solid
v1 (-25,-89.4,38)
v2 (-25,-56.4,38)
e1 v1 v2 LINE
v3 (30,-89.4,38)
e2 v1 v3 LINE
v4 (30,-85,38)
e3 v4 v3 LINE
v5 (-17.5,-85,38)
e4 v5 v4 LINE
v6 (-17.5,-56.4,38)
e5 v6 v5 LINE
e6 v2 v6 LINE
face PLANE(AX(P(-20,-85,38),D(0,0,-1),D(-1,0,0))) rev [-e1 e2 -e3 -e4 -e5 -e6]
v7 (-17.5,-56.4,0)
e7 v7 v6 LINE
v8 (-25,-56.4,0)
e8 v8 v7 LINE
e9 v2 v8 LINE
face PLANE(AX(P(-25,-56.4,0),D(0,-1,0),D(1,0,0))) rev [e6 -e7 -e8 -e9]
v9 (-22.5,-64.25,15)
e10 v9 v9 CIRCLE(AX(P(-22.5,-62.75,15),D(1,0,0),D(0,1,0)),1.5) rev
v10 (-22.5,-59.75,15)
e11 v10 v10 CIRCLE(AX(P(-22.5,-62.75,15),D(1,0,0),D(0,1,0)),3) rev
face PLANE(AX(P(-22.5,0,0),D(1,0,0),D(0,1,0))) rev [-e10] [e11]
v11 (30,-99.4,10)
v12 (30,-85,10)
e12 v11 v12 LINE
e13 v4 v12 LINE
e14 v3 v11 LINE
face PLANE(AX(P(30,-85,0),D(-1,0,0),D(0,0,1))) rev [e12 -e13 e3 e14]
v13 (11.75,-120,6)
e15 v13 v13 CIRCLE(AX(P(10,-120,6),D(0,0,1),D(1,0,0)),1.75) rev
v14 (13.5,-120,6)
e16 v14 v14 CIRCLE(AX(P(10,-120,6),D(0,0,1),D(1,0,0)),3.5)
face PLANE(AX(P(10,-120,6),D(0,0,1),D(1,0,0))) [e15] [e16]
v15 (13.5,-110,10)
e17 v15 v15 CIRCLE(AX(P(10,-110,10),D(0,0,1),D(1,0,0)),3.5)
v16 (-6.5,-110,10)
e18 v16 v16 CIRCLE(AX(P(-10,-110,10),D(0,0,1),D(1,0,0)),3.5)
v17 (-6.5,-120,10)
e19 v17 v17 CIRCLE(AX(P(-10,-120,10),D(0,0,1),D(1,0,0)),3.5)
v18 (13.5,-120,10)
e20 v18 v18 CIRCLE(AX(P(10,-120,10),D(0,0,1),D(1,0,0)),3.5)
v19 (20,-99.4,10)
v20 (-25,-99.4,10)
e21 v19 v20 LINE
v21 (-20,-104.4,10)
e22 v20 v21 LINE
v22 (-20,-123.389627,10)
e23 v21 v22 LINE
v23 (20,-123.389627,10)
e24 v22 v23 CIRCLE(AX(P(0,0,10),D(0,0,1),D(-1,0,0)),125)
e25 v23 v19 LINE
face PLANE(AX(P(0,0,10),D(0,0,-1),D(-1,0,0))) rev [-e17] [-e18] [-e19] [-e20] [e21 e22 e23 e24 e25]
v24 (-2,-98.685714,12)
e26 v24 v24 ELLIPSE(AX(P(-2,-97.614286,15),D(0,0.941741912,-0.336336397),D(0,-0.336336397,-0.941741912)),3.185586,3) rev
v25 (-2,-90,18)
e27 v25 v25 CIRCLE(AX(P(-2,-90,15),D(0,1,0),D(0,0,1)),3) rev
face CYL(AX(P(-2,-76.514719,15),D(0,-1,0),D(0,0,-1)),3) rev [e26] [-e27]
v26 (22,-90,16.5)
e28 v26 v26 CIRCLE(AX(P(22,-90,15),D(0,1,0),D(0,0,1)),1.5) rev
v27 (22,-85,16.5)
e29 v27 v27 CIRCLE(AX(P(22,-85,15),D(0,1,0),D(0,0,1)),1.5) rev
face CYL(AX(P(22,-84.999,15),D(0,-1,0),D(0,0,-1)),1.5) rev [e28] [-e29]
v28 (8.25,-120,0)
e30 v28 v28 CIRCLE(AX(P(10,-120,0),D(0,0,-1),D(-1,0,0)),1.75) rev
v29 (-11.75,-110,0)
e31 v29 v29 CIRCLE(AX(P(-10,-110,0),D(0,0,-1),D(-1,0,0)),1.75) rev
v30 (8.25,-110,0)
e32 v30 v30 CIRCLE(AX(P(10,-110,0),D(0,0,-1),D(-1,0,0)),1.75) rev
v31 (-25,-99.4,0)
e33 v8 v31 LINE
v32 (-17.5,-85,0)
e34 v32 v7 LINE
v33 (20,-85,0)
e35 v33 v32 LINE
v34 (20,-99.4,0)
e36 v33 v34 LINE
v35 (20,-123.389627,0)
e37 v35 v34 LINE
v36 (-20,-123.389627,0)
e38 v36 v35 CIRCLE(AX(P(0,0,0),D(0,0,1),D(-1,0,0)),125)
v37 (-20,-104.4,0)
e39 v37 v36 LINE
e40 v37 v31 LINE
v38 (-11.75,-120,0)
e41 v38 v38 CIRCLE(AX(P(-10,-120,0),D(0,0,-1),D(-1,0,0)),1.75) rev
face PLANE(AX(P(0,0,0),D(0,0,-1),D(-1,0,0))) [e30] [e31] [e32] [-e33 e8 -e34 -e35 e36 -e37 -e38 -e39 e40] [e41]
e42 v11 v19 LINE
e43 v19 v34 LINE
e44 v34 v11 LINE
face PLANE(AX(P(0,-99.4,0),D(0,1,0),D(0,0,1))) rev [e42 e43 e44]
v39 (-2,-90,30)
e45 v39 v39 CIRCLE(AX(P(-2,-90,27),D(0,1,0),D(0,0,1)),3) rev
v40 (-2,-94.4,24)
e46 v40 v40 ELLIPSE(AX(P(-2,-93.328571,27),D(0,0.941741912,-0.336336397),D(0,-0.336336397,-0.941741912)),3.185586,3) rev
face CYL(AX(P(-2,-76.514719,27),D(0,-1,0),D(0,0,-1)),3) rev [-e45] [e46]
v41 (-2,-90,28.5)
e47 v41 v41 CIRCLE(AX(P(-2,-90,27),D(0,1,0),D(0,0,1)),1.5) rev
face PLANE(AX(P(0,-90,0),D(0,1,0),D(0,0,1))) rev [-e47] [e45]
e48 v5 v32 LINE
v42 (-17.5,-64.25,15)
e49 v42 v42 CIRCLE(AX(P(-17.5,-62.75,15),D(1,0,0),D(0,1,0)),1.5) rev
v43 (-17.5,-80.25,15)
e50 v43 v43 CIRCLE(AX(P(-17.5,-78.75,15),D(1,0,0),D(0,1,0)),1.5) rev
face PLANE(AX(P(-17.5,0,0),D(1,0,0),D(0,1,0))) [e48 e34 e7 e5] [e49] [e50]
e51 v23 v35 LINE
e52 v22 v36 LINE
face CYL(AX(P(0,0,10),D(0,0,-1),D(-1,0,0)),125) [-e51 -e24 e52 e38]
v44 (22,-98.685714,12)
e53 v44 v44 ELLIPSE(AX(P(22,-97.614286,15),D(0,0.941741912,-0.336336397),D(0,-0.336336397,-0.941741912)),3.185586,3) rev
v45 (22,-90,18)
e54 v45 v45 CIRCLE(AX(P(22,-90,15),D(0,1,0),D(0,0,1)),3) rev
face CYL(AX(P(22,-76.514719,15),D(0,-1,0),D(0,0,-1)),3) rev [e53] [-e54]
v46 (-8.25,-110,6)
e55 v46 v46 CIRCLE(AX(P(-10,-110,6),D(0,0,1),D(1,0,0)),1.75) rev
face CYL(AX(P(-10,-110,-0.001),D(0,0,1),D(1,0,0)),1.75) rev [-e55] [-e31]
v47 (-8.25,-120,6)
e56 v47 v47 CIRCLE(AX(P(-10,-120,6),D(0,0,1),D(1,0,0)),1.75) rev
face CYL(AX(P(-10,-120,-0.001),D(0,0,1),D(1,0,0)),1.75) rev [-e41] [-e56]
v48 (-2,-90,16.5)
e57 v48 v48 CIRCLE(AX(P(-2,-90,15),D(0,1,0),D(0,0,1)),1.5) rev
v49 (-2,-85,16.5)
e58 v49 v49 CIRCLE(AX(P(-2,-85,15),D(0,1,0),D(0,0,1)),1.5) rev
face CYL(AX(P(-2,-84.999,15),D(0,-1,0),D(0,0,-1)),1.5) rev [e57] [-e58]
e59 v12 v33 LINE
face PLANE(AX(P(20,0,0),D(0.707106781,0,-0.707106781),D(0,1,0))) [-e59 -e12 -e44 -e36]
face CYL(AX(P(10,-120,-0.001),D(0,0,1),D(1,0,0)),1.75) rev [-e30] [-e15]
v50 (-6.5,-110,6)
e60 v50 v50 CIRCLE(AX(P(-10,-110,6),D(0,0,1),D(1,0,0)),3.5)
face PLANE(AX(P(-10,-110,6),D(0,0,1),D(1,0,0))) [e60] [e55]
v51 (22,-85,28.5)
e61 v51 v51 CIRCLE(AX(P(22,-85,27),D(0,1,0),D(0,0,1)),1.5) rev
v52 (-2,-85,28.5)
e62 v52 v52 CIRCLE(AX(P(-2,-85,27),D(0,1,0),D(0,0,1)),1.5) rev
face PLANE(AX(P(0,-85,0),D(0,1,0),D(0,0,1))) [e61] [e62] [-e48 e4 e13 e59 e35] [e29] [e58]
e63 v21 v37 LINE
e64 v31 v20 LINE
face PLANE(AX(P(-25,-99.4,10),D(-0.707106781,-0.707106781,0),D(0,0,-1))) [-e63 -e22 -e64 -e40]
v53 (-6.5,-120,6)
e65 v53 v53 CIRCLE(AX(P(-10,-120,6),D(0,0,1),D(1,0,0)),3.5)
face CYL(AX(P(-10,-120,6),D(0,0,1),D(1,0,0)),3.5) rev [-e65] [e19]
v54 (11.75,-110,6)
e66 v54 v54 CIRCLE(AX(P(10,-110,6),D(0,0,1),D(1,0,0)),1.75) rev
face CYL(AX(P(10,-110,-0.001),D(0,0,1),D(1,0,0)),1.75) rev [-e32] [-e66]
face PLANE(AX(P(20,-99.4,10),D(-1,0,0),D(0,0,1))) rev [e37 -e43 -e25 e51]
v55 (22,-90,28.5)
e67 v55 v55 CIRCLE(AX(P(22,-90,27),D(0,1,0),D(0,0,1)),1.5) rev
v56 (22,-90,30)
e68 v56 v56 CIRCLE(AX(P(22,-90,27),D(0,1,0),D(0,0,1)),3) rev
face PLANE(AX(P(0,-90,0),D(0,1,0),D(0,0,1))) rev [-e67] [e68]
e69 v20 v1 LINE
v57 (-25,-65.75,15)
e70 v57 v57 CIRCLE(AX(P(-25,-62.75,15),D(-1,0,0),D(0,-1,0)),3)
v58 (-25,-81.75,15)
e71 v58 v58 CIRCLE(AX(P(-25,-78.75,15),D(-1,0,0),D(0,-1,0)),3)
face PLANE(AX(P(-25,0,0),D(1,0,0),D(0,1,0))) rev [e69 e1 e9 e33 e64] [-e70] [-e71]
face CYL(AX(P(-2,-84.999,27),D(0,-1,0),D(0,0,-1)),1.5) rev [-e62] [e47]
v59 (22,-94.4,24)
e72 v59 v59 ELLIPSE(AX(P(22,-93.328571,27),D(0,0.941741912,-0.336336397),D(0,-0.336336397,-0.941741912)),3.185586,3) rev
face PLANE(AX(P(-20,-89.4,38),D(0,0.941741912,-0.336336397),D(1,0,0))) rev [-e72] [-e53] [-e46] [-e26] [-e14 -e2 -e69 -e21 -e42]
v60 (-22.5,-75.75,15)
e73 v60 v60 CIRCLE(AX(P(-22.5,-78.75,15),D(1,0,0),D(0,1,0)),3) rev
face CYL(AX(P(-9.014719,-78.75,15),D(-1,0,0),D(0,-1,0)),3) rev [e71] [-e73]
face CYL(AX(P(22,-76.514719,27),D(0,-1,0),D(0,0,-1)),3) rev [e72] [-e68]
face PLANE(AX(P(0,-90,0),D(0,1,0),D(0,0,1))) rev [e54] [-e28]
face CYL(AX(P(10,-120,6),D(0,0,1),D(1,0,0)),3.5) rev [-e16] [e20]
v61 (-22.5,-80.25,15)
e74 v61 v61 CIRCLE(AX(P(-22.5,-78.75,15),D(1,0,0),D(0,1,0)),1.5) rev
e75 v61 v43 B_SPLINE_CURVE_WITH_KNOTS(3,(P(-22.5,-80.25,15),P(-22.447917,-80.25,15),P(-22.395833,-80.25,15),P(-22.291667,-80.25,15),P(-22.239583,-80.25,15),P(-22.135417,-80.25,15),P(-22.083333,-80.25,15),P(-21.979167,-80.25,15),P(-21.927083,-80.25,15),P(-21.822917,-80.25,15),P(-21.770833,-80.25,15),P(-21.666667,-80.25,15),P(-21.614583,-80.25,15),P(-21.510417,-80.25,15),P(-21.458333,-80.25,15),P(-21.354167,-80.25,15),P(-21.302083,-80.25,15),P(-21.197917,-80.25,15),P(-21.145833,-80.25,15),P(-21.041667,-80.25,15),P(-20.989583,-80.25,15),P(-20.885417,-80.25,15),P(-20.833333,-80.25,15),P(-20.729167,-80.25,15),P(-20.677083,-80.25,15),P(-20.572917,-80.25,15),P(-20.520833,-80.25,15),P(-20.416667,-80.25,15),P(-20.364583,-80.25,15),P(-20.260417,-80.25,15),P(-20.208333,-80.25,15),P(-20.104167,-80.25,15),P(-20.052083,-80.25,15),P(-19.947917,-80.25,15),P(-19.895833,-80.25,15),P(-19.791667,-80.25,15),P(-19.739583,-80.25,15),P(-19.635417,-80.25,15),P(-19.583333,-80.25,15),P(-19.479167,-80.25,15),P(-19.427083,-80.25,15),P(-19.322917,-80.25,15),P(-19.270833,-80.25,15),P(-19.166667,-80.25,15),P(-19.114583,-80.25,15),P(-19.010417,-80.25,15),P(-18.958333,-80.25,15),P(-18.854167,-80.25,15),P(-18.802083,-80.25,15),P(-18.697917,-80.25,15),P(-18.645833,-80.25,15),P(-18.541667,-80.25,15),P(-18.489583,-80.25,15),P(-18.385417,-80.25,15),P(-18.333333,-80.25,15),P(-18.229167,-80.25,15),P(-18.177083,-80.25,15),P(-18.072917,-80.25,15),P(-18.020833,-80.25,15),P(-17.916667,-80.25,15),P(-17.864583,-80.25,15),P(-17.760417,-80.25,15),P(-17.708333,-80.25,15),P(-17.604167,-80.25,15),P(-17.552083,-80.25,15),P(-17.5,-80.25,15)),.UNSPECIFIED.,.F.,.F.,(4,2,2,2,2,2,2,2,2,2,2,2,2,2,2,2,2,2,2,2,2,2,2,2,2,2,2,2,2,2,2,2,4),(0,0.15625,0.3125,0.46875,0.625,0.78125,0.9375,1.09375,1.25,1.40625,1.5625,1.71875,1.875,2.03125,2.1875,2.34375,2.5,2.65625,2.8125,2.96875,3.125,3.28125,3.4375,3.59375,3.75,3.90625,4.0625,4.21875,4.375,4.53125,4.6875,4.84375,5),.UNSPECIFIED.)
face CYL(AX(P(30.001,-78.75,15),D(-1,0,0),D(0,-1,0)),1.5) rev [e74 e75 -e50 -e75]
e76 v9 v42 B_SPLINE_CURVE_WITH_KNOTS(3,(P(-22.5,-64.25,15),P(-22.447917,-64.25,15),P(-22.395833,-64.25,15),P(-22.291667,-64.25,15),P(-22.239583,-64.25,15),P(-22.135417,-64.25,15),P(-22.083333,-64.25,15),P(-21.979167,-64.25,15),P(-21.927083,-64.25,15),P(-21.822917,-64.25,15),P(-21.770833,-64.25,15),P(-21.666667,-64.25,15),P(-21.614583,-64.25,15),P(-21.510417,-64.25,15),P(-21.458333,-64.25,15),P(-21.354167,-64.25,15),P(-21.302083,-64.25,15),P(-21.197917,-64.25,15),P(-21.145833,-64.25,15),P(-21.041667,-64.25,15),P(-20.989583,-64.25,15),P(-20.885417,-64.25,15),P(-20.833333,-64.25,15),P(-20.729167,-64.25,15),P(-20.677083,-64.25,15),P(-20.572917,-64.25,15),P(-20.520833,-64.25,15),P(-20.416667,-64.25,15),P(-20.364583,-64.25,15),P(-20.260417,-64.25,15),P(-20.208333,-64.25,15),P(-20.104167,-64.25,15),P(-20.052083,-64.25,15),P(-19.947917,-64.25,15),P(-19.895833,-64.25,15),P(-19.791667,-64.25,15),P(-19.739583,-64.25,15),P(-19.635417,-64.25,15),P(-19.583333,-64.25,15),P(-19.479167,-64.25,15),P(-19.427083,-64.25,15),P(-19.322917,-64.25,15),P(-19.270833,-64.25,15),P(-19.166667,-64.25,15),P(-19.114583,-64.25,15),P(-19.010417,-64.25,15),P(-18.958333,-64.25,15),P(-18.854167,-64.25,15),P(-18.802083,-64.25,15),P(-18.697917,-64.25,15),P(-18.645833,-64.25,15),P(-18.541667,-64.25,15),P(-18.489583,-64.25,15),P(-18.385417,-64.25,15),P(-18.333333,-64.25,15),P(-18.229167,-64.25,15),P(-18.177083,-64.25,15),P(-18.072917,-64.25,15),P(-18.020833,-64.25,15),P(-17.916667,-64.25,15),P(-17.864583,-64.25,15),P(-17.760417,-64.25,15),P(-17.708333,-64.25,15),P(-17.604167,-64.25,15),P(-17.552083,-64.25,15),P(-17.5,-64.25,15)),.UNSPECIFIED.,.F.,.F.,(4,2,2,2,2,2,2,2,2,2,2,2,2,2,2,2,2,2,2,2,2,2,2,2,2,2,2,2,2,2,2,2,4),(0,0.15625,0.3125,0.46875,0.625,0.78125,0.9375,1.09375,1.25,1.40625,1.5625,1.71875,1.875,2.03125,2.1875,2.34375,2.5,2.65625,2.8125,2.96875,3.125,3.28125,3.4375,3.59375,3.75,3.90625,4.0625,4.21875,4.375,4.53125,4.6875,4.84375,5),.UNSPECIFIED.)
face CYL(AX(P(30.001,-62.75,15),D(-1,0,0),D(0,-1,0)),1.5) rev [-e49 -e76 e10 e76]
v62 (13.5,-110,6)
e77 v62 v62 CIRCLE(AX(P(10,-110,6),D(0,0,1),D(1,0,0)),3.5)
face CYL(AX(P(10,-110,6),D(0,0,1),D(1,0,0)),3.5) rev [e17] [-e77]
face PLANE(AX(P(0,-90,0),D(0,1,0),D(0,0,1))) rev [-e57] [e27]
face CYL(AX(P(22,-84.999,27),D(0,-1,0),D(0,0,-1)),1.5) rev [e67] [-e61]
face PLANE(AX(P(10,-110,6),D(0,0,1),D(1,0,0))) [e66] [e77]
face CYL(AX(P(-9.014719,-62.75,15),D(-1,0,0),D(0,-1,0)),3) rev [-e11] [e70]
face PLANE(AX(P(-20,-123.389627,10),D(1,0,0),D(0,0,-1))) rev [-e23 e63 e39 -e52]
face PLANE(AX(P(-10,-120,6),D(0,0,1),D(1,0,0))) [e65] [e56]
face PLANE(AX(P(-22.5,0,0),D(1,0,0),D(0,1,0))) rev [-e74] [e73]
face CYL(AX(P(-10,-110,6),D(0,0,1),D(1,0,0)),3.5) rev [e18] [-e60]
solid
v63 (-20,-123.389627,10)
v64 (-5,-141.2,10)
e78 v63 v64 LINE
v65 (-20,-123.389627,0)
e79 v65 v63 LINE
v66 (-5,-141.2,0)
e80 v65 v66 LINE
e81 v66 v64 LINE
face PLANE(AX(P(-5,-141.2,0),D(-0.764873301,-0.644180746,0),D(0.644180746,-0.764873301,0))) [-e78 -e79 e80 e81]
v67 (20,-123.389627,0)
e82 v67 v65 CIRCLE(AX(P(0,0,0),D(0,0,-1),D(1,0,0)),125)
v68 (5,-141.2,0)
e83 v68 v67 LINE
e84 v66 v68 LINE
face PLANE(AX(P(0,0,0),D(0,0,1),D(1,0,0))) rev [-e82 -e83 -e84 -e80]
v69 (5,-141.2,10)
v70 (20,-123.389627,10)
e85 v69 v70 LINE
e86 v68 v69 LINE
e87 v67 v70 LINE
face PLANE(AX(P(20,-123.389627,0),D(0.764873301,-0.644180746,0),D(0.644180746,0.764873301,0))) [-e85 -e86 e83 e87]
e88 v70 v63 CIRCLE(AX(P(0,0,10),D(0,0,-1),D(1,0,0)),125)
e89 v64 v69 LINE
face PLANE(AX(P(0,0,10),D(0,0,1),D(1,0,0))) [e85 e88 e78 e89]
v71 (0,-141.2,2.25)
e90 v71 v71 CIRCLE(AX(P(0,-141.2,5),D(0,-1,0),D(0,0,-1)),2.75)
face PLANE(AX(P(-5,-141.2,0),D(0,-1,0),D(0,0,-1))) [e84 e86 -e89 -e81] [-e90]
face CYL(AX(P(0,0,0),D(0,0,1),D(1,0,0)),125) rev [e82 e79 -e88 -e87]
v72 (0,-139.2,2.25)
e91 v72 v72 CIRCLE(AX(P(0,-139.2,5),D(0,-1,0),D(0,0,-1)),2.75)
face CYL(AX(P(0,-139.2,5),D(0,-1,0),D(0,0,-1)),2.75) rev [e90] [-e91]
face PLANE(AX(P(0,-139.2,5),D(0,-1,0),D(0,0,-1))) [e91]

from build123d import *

# Parameters (mm, degrees)
BOSS_EXTRU_1_DEPTH      = 10
ENL_V_MAT_EXTRU_1_REACH = 128.984
ESQUISSE2_R             = 1.75
ESQUISSE4_R             = 3.5
ENL_V_MAT_EXTRU_2_DEPTH = 4
ESQUISSE5_W             = 50
ESQUISSE5_H             = 38
BOSS_EXTRU_2_DEPTH      = 14.4
ENL_V_MAT_EXTRU_3_REACH = 56.766
ESQUISSE6_R             = 1.5
ESQUISSE7_R             = 3
ENL_V_MAT_EXTRU_4_DEPTH = 9.4
CHANFREIN1_SIZE         = 10
CHANFREIN2_SIZE         = 28
CHANFREIN2_SIZE_2       = 10
BOSS_EXTRU_3_DEPTH      = 5
ESQUISSE9_W             = 38
ESQUISSE9_H             = 28.6
BOSS_EXTRU_4_DEPTH      = 2.5
CHANFREIN3_SIZE         = 5
ENL_V_MAT_EXTRU_5_REACH = 143.753
ESQUISSE10_R            = 1.5
ESQUISSE11_R            = 3
ENL_V_MAT_EXTRU_6_DEPTH = 2.5
BOSS_EXTRU_5_DEPTH      = 10
ESQUISSE14_R            = 2.75
ENL_V_MAT_EXTRU_7_DEPTH = 2


# Some blends are built 0.0001 mm under size
with BuildPart() as part:
    # Esquisse1 → Boss.-Extru.1 (new body)
    with BuildSketch(Plane.XY):
        with BuildLine():
            Line((-20, -123.389626793), (-20, -99.4))
            Line((-20, -99.4), (20, -99.4))
            Line((20, -99.4), (20, -123.389626793))
            ThreePointArc((20, -123.389626793), (0, -125), (-20, -123.389626793))
        make_face()
    extrude(amount=BOSS_EXTRU_1_DEPTH)

    # Esquisse2 → Enlèv. mat.-Extru.1 (cut, up to next)
    with BuildSketch(Plane.XY.offset(10), mode=Mode.PRIVATE) as enl_v_mat_extru_1_sk1:
        with Locations((-10, -110)):
            Circle(ESQUISSE2_R)
    enl_v_mat_extru_1_tool1 = extrude(enl_v_mat_extru_1_sk1.sketch, amount=-ENL_V_MAT_EXTRU_1_REACH, mode=Mode.PRIVATE) & part.part
    # Esquisse2 → Enlèv. mat.-Extru.1 (cut, up to next)
    with BuildSketch(Plane.XY.offset(10), mode=Mode.PRIVATE) as enl_v_mat_extru_1_sk2:
        with Locations((-10, -120)):
            Circle(ESQUISSE2_R)
    enl_v_mat_extru_1_tool2 = extrude(enl_v_mat_extru_1_sk2.sketch, amount=-ENL_V_MAT_EXTRU_1_REACH, mode=Mode.PRIVATE) & part.part
    # Esquisse2 → Enlèv. mat.-Extru.1 (cut, up to next)
    with BuildSketch(Plane.XY.offset(10), mode=Mode.PRIVATE) as enl_v_mat_extru_1_sk3:
        with Locations((10, -110)):
            Circle(ESQUISSE2_R)
    enl_v_mat_extru_1_tool3 = extrude(enl_v_mat_extru_1_sk3.sketch, amount=-ENL_V_MAT_EXTRU_1_REACH, mode=Mode.PRIVATE) & part.part
    # Esquisse2 → Enlèv. mat.-Extru.1 (cut, up to next)
    with BuildSketch(Plane.XY.offset(10), mode=Mode.PRIVATE) as enl_v_mat_extru_1_sk4:
        with Locations((10, -120)):
            Circle(ESQUISSE2_R)
    enl_v_mat_extru_1_tool4 = extrude(enl_v_mat_extru_1_sk4.sketch, amount=-ENL_V_MAT_EXTRU_1_REACH, mode=Mode.PRIVATE) & part.part
    add(enl_v_mat_extru_1_tool1.solids().sort_by_distance((-10, -110, 10))[0], mode=Mode.SUBTRACT)
    add(enl_v_mat_extru_1_tool2.solids().sort_by_distance((-10, -120, 10))[0], mode=Mode.SUBTRACT)
    add(enl_v_mat_extru_1_tool3.solids().sort_by_distance((10, -110, 10))[0], mode=Mode.SUBTRACT)
    add(enl_v_mat_extru_1_tool4.solids().sort_by_distance((10, -120, 10))[0], mode=Mode.SUBTRACT)

    # Esquisse4 → Enlèv. mat.-Extru.2 (cut)
    with BuildSketch(Plane.XY.offset(10)):
        with Locations((-10, -110)):
            Circle(ESQUISSE4_R)
        with Locations((10, -110)):
            Circle(ESQUISSE4_R)
        with Locations((10, -120)):
            Circle(ESQUISSE4_R)
        with Locations((-10, -120)):
            Circle(ESQUISSE4_R)
    extrude(amount=-ENL_V_MAT_EXTRU_2_DEPTH, mode=Mode.SUBTRACT)

    # Esquisse5 → Boss.-Extru.2 (add)
    with BuildSketch(Plane(origin=(0, -99.4, 0), x_dir=(1, 0, 0), z_dir=(0, 1, 0))):
        with Locations((5, -19)):
            Rectangle(ESQUISSE5_W, ESQUISSE5_H)
    extrude(amount=BOSS_EXTRU_2_DEPTH)

    # Esquisse6 → Enlèv. mat.-Extru.3 (cut, up to next)
    with BuildSketch(Plane.XZ.offset(99.4), mode=Mode.PRIVATE) as enl_v_mat_extru_3_sk1:
        with Locations(Location((-2, 27, 0), (0, 0, 270))):
            Circle(ESQUISSE6_R)
    enl_v_mat_extru_3_tool1 = extrude(enl_v_mat_extru_3_sk1.sketch, amount=-ENL_V_MAT_EXTRU_3_REACH, mode=Mode.PRIVATE) & part.part
    # Esquisse6 → Enlèv. mat.-Extru.3 (cut, up to next)
    with BuildSketch(Plane.XZ.offset(99.4), mode=Mode.PRIVATE) as enl_v_mat_extru_3_sk2:
        with Locations(Location((22, 27, 0), (0, 0, 270))):
            Circle(ESQUISSE6_R)
    enl_v_mat_extru_3_tool2 = extrude(enl_v_mat_extru_3_sk2.sketch, amount=-ENL_V_MAT_EXTRU_3_REACH, mode=Mode.PRIVATE) & part.part
    # Esquisse6 → Enlèv. mat.-Extru.3 (cut, up to next)
    with BuildSketch(Plane.XZ.offset(99.4), mode=Mode.PRIVATE) as enl_v_mat_extru_3_sk3:
        with Locations(Location((-2, 15, 0), (0, 0, 270))):
            Circle(ESQUISSE6_R)
    enl_v_mat_extru_3_tool3 = extrude(enl_v_mat_extru_3_sk3.sketch, amount=-ENL_V_MAT_EXTRU_3_REACH, mode=Mode.PRIVATE) & part.part
    # Esquisse6 → Enlèv. mat.-Extru.3 (cut, up to next)
    with BuildSketch(Plane.XZ.offset(99.4), mode=Mode.PRIVATE) as enl_v_mat_extru_3_sk4:
        with Locations(Location((22, 15, 0), (0, 0, 270))):
            Circle(ESQUISSE6_R)
    enl_v_mat_extru_3_tool4 = extrude(enl_v_mat_extru_3_sk4.sketch, amount=-ENL_V_MAT_EXTRU_3_REACH, mode=Mode.PRIVATE) & part.part
    add(enl_v_mat_extru_3_tool1.solids().sort_by_distance((-2, -99.4, 27))[0], mode=Mode.SUBTRACT)
    add(enl_v_mat_extru_3_tool2.solids().sort_by_distance((22, -99.4, 27))[0], mode=Mode.SUBTRACT)
    add(enl_v_mat_extru_3_tool3.solids().sort_by_distance((-2, -99.4, 15))[0], mode=Mode.SUBTRACT)
    add(enl_v_mat_extru_3_tool4.solids().sort_by_distance((22, -99.4, 15))[0], mode=Mode.SUBTRACT)

    # Esquisse7 → Enlèv. mat.-Extru.4 (cut)
    with BuildSketch(Plane.XZ.offset(99.4)):
        with Locations(Location((-2, 27, 0), (0, 0, 270))):
            Circle(ESQUISSE7_R)
        with Locations(Location((22, 27, 0), (0, 0, 270))):
            Circle(ESQUISSE7_R)
        with Locations(Location((22, 15, 0), (0, 0, 270))):
            Circle(ESQUISSE7_R)
        with Locations(Location((-2, 15, 0), (0, 0, 270))):
            Circle(ESQUISSE7_R)
    extrude(amount=-ENL_V_MAT_EXTRU_4_DEPTH, mode=Mode.SUBTRACT)

    # Chanfrein1
    chanfrein1_edges = [part.edges().sort_by_distance(p)[0] for p in [
        (30, -92.2, 0),
    ]]
    chamfer(chanfrein1_edges, length=CHANFREIN1_SIZE)

    # Chanfrein2
    # the kernel refuses this chamfer: 28, 10 mm, written as the material it takes off along each edge
    with BuildSketch(Plane(origin=(102.642981969, -99.4, 38), x_dir=(0, -0.01296397650632004, -0.9999159641255577), z_dir=(-1, 0, 0))) as chanfrein2_piece_1:
        Polygon((CHANFREIN2_SIZE * 0.999915964126, -CHANFREIN2_SIZE * 0.0129639765063), (-CHANFREIN2_SIZE_2 * 0.0129639765063, -CHANFREIN2_SIZE_2 * 0.999915964126), (0, 0), align=None)
    extrude(amount=195.285963938, mode=Mode.SUBTRACT)

    # Esquisse8 → Boss.-Extru.3 (add)
    with BuildSketch(Plane.ZY.offset(20)):
        Polygon((10, -99.4), (0, -99.4), (0, -56.4), (38, -56.4), (38, -89.4), align=None)
    extrude(amount=BOSS_EXTRU_3_DEPTH)

    # Esquisse9 → Boss.-Extru.4 (add)
    with BuildSketch(Plane(origin=(-20, 0, 0), x_dir=(0, 0, -1), z_dir=(1, 0, 0))):
        with Locations((-19, -70.7)):
            Rectangle(ESQUISSE9_W, ESQUISSE9_H)
    extrude(amount=BOSS_EXTRU_4_DEPTH)

    # Chanfrein3
    chanfrein3_edges = [part.edges().sort_by_distance(p)[0] for p in [
        (-20, -99.4, 5),
    ]]
    chamfer(chanfrein3_edges, length=CHANFREIN3_SIZE - 0.0001)  # a hair under: the kernel refuses the full size

    # Esquisse10 → Enlèv. mat.-Extru.5 (cut, up to next)
    with BuildSketch(Plane.ZY.offset(25), mode=Mode.PRIVATE) as enl_v_mat_extru_5_sk1:
        with Locations(Location((15, -62.75, 0), (0, 0, 270))):
            Circle(ESQUISSE10_R)
    enl_v_mat_extru_5_tool1 = extrude(enl_v_mat_extru_5_sk1.sketch, amount=-ENL_V_MAT_EXTRU_5_REACH, mode=Mode.PRIVATE) & part.part
    # Esquisse10 → Enlèv. mat.-Extru.5 (cut, up to next)
    with BuildSketch(Plane.ZY.offset(25), mode=Mode.PRIVATE) as enl_v_mat_extru_5_sk2:
        with Locations(Location((15, -78.75, 0), (0, 0, 270))):
            Circle(ESQUISSE10_R)
    enl_v_mat_extru_5_tool2 = extrude(enl_v_mat_extru_5_sk2.sketch, amount=-ENL_V_MAT_EXTRU_5_REACH, mode=Mode.PRIVATE) & part.part
    add(enl_v_mat_extru_5_tool1.solids().sort_by_distance((-25, -62.75, 15))[0], mode=Mode.SUBTRACT)
    add(enl_v_mat_extru_5_tool2.solids().sort_by_distance((-25, -78.75, 15))[0], mode=Mode.SUBTRACT)

    # Esquisse11 → Enlèv. mat.-Extru.6 (cut)
    with BuildSketch(Plane.ZY.offset(25)):
        with Locations(Location((15, -62.75, 0), (0, 0, 270))):
            Circle(ESQUISSE11_R)
        with Locations(Location((15, -78.75, 0), (0, 0, 270))):
            Circle(ESQUISSE11_R)
    extrude(amount=-ENL_V_MAT_EXTRU_6_DEPTH, mode=Mode.SUBTRACT)


with BuildPart() as body_2:
    # Esquisse12 → Boss.-Extru.5 (new body)
    with BuildSketch(Plane.XY.offset(10)):
        with BuildLine():
            Line((-5, -141.2), (5, -141.2))
            Line((5, -141.2), (20, -123.389626793))
            ThreePointArc((20, -123.389626793), (0, -125), (-20, -123.389626793))
            Line((-20, -123.389626793), (-5, -141.2))
        make_face()
    extrude(amount=-BOSS_EXTRU_5_DEPTH)

    # Esquisse14 → Enlèv. mat.-Extru.7 (cut)
    with BuildSketch(Plane.XZ.offset(141.2)):
        with Locations(Location((0, 5, 0), (0, 0, 270))):
            Circle(ESQUISSE14_R)
    extrude(amount=-ENL_V_MAT_EXTRU_7_DEPTH, mode=Mode.SUBTRACT)


solid = Compound([part.part, body_2.part])
